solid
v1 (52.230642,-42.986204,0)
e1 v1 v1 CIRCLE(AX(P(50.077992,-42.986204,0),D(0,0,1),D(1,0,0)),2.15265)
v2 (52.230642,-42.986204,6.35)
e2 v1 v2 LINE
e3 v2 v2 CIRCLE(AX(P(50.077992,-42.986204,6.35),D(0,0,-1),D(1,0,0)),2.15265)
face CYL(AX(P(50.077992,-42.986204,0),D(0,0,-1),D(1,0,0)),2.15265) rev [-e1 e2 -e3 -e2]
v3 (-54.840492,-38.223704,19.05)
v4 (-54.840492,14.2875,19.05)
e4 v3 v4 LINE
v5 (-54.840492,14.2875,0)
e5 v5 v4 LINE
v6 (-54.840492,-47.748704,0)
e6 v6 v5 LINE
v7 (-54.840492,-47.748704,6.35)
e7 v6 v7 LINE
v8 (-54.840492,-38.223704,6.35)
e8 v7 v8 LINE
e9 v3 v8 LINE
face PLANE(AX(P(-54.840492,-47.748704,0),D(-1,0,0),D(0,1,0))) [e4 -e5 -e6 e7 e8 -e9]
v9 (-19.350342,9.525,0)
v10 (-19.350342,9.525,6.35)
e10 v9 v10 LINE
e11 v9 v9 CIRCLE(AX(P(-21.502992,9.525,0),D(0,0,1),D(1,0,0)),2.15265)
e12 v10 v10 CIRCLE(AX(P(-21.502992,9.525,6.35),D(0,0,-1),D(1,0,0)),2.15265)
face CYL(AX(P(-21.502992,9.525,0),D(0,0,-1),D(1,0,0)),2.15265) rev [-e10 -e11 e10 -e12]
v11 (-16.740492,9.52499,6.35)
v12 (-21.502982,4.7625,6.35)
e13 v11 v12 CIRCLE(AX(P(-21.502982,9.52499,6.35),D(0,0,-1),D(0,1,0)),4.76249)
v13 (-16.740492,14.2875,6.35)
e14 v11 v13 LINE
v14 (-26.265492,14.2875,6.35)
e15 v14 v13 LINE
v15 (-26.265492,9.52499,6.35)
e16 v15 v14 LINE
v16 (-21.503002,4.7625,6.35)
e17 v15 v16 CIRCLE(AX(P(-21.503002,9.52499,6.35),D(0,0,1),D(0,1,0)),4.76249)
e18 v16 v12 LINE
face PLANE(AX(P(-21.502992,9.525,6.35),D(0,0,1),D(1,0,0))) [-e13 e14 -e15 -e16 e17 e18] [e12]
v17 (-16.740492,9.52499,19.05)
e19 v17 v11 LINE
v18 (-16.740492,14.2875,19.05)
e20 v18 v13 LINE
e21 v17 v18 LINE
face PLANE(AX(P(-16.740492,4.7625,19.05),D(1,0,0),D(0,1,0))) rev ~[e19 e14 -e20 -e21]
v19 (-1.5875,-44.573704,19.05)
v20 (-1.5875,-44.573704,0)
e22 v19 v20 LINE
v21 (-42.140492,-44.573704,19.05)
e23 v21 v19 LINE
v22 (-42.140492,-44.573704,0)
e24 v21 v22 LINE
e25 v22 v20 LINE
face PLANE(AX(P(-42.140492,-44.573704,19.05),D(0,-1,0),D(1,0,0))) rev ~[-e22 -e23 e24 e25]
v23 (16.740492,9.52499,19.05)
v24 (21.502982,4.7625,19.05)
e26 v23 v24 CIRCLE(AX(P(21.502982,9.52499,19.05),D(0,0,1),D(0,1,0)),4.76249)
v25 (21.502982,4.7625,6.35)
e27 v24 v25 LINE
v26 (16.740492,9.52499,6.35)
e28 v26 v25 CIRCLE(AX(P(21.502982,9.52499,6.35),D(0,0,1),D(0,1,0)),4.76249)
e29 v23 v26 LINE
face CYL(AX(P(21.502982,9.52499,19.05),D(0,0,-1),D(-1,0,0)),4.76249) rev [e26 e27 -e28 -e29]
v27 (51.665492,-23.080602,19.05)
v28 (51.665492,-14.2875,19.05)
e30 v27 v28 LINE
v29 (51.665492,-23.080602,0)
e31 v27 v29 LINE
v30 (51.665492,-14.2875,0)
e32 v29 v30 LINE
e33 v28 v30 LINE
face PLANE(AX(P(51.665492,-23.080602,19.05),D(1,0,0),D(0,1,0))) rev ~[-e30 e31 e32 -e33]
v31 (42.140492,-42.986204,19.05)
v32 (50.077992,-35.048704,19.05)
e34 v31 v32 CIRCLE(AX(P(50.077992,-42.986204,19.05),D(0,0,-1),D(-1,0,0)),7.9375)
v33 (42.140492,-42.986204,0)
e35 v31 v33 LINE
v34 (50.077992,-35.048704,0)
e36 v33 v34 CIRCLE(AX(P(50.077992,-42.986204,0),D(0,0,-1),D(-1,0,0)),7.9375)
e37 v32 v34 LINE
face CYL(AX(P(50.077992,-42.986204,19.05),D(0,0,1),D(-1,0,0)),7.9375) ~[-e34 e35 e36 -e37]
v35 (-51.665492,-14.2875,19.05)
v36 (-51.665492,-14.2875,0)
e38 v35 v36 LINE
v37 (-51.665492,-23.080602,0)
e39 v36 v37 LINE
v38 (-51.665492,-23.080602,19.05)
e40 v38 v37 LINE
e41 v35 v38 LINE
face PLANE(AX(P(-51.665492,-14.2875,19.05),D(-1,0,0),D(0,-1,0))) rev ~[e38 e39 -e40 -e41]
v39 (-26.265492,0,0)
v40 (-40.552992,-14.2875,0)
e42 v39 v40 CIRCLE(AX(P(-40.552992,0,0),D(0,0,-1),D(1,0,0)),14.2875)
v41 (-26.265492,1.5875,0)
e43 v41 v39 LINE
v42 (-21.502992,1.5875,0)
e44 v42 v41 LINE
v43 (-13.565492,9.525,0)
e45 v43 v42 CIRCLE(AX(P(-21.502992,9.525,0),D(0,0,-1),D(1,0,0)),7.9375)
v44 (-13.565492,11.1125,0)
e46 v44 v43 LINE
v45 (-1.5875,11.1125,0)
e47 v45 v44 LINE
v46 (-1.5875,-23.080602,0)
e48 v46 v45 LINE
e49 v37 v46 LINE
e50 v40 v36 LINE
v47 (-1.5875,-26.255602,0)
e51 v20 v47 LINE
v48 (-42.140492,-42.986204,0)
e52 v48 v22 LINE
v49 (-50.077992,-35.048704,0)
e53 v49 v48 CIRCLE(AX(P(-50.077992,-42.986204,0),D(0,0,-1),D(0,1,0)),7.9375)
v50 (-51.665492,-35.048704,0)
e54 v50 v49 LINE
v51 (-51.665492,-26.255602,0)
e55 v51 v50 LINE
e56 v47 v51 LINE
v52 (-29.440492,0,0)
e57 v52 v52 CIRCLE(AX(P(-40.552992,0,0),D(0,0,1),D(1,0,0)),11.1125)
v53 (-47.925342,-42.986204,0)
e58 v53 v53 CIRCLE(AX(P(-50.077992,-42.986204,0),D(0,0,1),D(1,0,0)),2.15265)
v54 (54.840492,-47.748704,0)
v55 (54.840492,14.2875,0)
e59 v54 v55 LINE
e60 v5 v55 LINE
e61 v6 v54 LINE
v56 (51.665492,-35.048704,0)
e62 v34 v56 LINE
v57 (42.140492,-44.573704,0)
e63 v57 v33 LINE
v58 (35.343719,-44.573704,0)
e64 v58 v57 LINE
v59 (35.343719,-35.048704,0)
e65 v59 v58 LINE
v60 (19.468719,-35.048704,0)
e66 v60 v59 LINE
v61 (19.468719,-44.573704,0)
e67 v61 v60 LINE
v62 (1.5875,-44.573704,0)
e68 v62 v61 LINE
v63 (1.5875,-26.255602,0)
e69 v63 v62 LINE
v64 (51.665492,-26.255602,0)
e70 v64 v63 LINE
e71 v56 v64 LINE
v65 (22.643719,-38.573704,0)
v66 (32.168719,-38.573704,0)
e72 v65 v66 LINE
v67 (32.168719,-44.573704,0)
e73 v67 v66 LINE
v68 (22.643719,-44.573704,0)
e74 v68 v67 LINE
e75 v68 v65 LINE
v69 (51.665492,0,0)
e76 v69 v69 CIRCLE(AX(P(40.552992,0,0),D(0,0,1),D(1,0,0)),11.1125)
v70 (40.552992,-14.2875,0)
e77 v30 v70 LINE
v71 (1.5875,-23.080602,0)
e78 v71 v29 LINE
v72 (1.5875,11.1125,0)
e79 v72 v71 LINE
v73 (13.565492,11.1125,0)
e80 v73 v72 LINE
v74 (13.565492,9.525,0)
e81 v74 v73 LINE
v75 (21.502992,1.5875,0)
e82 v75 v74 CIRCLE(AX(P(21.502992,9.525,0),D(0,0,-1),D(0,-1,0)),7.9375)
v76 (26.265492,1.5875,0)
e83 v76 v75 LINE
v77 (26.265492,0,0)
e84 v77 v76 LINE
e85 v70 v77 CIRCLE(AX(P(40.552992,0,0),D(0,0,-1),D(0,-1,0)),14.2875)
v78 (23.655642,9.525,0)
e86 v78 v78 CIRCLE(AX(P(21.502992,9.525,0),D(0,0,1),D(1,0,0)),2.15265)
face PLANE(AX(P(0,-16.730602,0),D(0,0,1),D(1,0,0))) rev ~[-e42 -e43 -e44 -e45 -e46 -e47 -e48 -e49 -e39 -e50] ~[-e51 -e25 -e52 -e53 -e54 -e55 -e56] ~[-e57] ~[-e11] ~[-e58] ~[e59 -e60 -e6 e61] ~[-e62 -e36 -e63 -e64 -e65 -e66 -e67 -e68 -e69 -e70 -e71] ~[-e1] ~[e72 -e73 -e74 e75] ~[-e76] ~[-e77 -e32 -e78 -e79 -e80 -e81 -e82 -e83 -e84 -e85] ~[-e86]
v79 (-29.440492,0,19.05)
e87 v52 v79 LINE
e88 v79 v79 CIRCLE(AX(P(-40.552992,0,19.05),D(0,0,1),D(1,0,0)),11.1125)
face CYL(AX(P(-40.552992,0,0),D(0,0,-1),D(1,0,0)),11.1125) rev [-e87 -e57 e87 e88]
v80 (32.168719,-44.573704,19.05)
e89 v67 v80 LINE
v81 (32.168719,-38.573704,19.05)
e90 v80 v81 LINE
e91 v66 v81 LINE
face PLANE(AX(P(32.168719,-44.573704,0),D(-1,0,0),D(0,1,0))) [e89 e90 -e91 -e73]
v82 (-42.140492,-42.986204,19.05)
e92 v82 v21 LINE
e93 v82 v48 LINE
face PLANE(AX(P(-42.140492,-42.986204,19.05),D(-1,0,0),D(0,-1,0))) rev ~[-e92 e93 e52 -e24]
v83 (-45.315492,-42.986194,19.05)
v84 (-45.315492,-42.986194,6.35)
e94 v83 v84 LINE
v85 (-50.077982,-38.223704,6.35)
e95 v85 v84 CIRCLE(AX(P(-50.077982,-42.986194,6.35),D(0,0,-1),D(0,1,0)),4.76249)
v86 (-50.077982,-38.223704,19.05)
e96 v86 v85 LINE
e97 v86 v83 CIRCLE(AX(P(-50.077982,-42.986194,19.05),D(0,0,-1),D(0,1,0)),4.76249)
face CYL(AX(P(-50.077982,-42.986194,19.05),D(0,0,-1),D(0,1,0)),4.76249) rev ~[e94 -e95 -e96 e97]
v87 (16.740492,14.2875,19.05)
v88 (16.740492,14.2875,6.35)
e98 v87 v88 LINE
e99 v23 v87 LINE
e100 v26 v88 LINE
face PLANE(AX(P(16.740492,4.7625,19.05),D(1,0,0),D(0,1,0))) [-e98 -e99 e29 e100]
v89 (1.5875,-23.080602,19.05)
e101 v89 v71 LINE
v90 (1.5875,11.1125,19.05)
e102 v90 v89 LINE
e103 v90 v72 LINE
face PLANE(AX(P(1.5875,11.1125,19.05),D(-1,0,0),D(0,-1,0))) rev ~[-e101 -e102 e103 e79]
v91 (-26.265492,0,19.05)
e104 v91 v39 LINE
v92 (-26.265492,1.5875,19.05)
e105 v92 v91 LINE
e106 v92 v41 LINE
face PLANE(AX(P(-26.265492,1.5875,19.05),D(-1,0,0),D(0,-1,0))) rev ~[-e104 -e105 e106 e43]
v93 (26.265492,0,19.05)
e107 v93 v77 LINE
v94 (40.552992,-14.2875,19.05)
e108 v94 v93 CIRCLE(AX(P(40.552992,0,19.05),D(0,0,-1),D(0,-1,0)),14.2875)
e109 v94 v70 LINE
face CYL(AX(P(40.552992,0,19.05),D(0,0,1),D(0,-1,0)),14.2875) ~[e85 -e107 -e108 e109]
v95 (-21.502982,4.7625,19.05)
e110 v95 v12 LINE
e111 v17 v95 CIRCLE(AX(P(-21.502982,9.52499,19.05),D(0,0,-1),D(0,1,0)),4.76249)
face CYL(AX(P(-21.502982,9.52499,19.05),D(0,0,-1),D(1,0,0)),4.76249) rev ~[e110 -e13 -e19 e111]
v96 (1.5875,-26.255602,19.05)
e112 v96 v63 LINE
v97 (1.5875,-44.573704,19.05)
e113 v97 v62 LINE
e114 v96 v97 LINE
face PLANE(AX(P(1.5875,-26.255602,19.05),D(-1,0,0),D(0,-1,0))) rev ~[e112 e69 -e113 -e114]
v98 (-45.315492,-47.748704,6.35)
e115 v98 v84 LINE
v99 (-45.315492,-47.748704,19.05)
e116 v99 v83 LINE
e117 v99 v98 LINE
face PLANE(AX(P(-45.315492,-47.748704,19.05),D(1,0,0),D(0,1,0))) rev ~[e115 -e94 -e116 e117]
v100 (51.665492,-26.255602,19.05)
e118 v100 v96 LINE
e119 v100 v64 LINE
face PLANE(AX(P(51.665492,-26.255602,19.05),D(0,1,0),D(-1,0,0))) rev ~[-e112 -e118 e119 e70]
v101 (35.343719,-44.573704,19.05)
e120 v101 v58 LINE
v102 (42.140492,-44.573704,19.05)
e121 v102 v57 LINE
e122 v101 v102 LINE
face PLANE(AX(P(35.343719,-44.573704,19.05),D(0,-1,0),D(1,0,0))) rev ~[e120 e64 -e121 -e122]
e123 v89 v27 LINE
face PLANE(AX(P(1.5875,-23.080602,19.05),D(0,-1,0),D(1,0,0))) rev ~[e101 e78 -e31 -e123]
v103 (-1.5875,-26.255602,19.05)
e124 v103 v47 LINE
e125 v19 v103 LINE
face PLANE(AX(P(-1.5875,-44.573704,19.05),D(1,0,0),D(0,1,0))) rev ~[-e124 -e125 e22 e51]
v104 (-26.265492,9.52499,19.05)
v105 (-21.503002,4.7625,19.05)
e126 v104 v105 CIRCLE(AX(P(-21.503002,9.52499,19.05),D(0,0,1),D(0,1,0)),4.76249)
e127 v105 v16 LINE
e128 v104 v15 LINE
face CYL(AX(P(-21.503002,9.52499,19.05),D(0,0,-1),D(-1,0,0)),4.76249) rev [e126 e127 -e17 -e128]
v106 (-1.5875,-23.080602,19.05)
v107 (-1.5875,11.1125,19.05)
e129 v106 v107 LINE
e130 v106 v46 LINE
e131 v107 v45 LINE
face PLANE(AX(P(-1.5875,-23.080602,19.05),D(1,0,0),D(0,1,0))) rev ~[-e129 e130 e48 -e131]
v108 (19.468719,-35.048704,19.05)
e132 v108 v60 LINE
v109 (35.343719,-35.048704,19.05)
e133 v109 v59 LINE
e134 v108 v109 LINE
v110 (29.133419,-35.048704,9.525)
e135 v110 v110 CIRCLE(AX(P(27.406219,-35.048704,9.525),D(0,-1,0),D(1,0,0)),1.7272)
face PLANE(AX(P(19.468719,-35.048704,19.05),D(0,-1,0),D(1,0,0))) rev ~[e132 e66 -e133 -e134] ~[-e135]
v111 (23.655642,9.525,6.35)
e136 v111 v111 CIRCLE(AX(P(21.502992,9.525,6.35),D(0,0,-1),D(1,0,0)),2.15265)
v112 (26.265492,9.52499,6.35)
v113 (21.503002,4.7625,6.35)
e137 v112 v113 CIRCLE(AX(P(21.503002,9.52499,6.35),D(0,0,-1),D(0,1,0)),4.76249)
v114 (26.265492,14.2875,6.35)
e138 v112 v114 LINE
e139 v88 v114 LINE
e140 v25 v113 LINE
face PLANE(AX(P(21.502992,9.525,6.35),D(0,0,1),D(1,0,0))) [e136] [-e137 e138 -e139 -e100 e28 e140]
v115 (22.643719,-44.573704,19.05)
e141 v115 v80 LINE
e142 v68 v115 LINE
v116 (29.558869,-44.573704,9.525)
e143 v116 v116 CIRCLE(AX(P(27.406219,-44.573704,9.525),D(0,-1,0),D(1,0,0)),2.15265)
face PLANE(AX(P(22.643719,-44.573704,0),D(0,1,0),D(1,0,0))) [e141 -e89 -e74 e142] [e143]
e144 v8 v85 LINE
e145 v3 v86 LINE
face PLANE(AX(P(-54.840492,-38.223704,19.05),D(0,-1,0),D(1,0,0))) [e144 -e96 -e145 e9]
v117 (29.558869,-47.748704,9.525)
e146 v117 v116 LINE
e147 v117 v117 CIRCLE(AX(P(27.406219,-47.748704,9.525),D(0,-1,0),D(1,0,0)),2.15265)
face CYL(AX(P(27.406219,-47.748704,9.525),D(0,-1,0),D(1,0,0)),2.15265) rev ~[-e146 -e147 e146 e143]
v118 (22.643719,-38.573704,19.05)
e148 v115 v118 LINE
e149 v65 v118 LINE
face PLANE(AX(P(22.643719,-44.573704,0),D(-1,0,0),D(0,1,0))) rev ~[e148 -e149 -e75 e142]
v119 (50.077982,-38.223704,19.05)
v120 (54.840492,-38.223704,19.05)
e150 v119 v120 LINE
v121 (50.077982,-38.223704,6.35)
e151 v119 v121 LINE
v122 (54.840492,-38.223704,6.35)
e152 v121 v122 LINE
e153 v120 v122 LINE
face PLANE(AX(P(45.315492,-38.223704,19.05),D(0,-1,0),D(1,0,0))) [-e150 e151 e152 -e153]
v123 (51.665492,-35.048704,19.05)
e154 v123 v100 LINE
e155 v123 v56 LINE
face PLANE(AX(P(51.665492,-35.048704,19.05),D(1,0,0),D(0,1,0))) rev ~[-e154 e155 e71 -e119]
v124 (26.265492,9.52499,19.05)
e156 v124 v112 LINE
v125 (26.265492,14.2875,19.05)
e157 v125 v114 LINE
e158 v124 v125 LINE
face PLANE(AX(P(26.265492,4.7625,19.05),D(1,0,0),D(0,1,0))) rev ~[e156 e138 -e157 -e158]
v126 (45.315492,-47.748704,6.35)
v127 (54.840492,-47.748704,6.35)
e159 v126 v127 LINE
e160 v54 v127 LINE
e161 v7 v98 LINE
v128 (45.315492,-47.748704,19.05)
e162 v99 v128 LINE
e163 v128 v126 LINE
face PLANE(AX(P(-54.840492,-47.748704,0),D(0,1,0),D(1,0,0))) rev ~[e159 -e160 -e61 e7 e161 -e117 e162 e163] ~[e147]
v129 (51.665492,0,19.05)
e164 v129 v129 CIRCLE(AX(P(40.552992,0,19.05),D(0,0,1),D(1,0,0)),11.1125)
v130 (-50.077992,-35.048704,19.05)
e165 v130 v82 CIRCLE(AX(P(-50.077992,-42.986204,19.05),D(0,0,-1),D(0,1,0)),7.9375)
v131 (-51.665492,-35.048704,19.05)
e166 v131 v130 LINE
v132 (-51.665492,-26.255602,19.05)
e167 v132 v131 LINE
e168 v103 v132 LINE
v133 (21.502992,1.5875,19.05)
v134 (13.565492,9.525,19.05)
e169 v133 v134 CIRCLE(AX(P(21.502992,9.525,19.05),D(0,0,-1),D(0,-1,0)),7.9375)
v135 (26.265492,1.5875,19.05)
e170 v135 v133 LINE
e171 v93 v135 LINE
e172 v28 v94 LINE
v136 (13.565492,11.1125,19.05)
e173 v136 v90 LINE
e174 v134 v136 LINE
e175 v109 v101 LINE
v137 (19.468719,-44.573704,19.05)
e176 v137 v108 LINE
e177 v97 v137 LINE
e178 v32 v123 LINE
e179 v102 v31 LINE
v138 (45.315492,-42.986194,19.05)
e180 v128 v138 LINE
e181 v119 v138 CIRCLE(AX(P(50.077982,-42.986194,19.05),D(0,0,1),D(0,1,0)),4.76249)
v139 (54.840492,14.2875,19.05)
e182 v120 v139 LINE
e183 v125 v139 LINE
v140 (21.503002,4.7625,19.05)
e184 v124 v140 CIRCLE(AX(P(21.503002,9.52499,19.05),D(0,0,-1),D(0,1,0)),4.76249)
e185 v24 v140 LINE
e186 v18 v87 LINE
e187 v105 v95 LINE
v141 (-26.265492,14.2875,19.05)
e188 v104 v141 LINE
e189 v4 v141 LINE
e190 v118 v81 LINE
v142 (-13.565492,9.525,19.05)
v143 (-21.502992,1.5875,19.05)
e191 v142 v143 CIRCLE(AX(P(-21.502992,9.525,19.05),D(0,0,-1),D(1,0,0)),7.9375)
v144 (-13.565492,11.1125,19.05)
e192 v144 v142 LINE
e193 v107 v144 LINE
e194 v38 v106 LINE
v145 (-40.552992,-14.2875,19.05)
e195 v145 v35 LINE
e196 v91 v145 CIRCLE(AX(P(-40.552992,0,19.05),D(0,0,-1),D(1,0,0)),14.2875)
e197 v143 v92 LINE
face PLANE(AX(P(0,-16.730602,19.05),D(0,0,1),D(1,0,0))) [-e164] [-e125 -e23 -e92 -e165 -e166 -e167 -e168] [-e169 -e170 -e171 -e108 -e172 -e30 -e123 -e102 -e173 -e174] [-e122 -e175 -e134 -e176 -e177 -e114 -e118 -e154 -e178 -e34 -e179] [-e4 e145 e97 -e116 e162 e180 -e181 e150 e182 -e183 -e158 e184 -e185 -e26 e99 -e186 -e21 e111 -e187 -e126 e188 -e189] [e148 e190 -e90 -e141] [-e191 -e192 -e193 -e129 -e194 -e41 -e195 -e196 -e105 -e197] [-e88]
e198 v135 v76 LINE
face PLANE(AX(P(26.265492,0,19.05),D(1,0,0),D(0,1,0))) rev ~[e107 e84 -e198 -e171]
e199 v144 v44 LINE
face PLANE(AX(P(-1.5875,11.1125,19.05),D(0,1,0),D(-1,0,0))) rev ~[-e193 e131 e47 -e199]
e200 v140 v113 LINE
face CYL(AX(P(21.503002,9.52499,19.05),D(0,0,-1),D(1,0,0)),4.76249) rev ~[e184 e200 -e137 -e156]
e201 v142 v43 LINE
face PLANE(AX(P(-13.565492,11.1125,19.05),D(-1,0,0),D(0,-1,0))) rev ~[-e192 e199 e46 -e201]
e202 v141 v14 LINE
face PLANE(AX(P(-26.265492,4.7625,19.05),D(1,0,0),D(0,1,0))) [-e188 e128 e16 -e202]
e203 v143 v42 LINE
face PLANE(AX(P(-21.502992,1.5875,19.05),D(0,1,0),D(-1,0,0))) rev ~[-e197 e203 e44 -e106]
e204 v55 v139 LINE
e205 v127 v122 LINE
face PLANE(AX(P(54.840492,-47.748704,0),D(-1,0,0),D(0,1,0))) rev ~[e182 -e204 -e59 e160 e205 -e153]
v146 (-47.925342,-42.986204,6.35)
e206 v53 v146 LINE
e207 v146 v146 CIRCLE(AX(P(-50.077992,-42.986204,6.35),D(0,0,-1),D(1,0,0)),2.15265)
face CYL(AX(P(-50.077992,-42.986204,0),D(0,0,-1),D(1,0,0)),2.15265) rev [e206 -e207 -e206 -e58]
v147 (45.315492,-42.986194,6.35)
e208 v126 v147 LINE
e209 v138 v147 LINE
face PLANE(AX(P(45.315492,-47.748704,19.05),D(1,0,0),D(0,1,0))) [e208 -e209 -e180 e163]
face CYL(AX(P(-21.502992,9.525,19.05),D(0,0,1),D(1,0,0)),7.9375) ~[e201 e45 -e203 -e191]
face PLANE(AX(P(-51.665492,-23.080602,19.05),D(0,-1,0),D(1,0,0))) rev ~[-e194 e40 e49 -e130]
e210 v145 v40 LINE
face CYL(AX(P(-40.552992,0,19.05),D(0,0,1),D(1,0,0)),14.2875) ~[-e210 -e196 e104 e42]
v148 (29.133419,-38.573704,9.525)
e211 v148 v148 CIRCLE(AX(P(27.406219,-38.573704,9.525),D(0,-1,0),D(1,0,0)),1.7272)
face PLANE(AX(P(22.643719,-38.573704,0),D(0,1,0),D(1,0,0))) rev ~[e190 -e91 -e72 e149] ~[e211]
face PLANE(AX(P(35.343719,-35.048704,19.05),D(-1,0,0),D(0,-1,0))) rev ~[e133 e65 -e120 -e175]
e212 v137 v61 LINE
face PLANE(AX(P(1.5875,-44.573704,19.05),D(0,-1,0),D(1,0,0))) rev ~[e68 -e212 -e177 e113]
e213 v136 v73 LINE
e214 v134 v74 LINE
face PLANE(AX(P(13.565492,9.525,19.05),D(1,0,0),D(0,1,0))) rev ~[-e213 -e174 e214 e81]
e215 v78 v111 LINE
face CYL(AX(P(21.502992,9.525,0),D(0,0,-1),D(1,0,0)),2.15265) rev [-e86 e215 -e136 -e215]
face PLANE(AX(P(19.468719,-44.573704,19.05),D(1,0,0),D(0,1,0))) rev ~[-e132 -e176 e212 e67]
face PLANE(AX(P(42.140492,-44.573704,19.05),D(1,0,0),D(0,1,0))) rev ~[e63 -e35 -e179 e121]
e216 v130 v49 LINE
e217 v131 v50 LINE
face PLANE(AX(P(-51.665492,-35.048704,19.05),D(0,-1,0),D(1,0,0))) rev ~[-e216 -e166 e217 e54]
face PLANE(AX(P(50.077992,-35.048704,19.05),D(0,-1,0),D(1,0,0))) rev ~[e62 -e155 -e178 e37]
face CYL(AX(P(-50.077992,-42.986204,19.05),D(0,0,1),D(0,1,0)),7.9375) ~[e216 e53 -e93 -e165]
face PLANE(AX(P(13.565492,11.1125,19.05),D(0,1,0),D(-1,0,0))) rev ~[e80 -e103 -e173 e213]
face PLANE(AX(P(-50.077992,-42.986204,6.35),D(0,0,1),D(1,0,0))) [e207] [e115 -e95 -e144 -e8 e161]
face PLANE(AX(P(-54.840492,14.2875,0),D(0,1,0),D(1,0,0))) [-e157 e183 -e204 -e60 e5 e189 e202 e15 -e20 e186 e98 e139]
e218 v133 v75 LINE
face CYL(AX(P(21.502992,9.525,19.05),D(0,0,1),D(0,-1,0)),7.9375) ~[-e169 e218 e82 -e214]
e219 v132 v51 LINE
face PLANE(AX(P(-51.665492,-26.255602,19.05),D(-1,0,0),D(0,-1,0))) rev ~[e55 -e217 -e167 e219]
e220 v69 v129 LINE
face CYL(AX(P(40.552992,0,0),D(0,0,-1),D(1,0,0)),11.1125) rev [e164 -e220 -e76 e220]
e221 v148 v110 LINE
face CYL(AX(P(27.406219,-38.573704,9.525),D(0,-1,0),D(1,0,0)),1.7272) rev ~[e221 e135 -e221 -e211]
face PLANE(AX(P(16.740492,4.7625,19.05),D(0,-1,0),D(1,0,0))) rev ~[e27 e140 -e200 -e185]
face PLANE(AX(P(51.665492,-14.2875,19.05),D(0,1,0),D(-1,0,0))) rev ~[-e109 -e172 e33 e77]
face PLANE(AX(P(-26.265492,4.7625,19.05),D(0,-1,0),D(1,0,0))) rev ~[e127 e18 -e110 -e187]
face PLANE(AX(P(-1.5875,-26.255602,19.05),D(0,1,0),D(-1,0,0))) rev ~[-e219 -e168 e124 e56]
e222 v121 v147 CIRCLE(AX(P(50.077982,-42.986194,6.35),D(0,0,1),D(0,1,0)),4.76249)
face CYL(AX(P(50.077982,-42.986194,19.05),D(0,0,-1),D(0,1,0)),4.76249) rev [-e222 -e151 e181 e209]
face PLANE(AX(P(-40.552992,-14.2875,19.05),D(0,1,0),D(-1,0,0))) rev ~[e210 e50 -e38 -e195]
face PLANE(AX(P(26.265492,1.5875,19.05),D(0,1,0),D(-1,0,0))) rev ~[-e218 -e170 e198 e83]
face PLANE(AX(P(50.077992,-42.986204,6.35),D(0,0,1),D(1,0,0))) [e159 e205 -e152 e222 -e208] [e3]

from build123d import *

# Parameters (mm, degrees)
F0_W      = 109.6809846
F0_H      = 62.036204
F0_R      = 2.15265
F0_W_2    = 9.525
F0_H_2    = 6
F0_R_2    = 11.1125
F1_DEPTH  = 19.05
F2_W      = 9.525
F2_H      = 9.525
F3_DEPTH  = 12.7
F4_R      = 4.76249
F6_DEPTH  = 19.05
F7_R      = 2.15265
F8_DEPTH  = 3.175
F9_R      = 1.7272
F10_DEPTH = 3.525


# Not quite as in the source:
# - a fillet or chamfer is up to 0.001 mm smaller than in the source, because OpenCascade refuses the exact size


with BuildPart() as f1:
    # F0 (on Top) → F1 (new body)
    with BuildSketch(Plane.XY):
        with Locations((0, -16.730602)):
            Rectangle(F0_W, F0_H)
        with Locations((-50.0779923, -42.986204)):
            Circle(F0_R, mode=Mode.SUBTRACT)
        with Locations((27.406219, -41.573704)):
            Rectangle(F0_W_2, F0_H_2, mode=Mode.SUBTRACT)
        with Locations((50.0779923, -42.986204)):
            Circle(F0_R, mode=Mode.SUBTRACT)
        with Locations((-40.5529923, 0)):
            Circle(F0_R_2, mode=Mode.SUBTRACT)
        with Locations((-21.5029923, 9.525)):
            Circle(F0_R, mode=Mode.SUBTRACT)
        with Locations((21.5029923, 9.525)):
            Circle(F0_R, mode=Mode.SUBTRACT)
        with Locations((40.5529923, 0)):
            Circle(F0_R_2, mode=Mode.SUBTRACT)
    extrude(amount=F1_DEPTH)

    # F2 (on face) → F3 (cut)
    with BuildSketch(Plane.XY.offset(19.05)):
        with Locations((-21.5029923, 9.525)):
            Rectangle(F2_W, F2_H)
        with Locations((21.5029923, 9.525)):
            Rectangle(F2_W, F2_H)
        with Locations((50.0779923, -42.986204)):
            Rectangle(F2_W, F2_H)
        with Locations((-50.0779923, -42.986204)):
            Rectangle(F2_W, F2_H)
    extrude(amount=-F3_DEPTH, mode=Mode.SUBTRACT)

    # F4 (radius 4.7625 in the source; OpenCascade refuses exactly that, so slightly less here)
    f4_edges = [f1.edges().sort_by_distance(p)[0] for p in [
        (-45.315492, -38.223704, 12.7),
        (45.315492, -38.223704, 12.7),
        (16.740492, 4.7625, 12.7),
        (26.265492, 4.7625, 12.7),
        (-16.740492, 4.7625, 12.7),
        (-26.265492, 4.7625, 12.7),
    ]]
    fillet(f4_edges, radius=F4_R)

    # F5 (on face) → F6 (cut, through all)
    with BuildSketch(Plane.XY.offset(19.05)):
        with BuildLine():
            Line((-51.6654923, -23.080602), (-1.5875, -23.080602))
            Line((-1.5875, -23.080602), (-1.5875, 11.1125))
            Line((-1.5875, 11.1125), (-13.5654923, 11.1125))
            Line((-13.5654923, 11.1125), (-13.5654923, 9.525))
            ThreePointArc((-13.5654923, 9.525), (-15.8903322243, 3.9123399243), (-21.5029923, 1.5875))
            Line((-21.5029923, 1.5875), (-26.2654923, 1.5875))
            Line((-26.2654923, 1.5875), (-26.2654923, 0))
            ThreePointArc((-26.2654923, 0), (-30.4502041638, -10.1027881362), (-40.5529923, -14.2875))
            Line((-40.5529923, -14.2875), (-51.6654923, -14.2875))
            Line((-51.6654923, -14.2875), (-51.6654923, -23.080602))
        make_face()
        with BuildLine():
            Line((-1.5875, -44.573704), (-1.5875, -26.255602))
            Line((-1.5875, -26.255602), (-51.6654923, -26.255602))
            Line((-51.6654923, -26.255602), (-51.6654923, -35.048704))
            Line((-51.6654923, -35.048704), (-50.0779923, -35.048704))
            ThreePointArc((-50.0779923, -35.048704), (-44.4653322243, -37.3735439243), (-42.1404923, -42.986204))
            Line((-42.1404923, -42.986204), (-42.1404923, -44.573704))
            Line((-42.1404923, -44.573704), (-1.5875, -44.573704))
        make_face()
        with BuildLine():
            Line((1.5875, -23.080602), (51.6654923, -23.080602))
            Line((51.6654923, -23.080602), (51.6654923, -14.2875))
            Line((51.6654923, -14.2875), (40.5529923, -14.2875))
            ThreePointArc((40.5529923, -14.2875), (30.4502041638, -10.1027881362), (26.2654923, 0))
            Line((26.2654923, 0), (26.2654923, 1.5875))
            Line((26.2654923, 1.5875), (21.5029923, 1.5875))
            ThreePointArc((21.5029923, 1.5875), (15.8903322243, 3.9123399243), (13.5654923, 9.525))
            Line((13.5654923, 9.525), (13.5654923, 11.1125))
            Line((13.5654923, 11.1125), (1.5875, 11.1125))
            Line((1.5875, 11.1125), (1.5875, -23.080602))
        make_face()
        with BuildLine():
            Line((51.6654923, -26.255602), (1.5875, -26.255602))
            Line((1.5875, -26.255602), (1.5875, -44.573704))
            Line((1.5875, -44.573704), (19.468719, -44.573704))
            Line((19.468719, -44.573704), (19.468719, -35.048704))
            Line((19.468719, -35.048704), (35.343719, -35.048704))
            Line((35.343719, -35.048704), (35.343719, -44.573704))
            Line((35.343719, -44.573704), (42.1404923, -44.573704))
            Line((42.1404923, -44.573704), (42.1404923, -42.986204))
            ThreePointArc((42.1404923, -42.986204), (44.4653322243, -37.3735439243), (50.0779923, -35.048704))
            Line((50.0779923, -35.048704), (51.6654923, -35.048704))
            Line((51.6654923, -35.048704), (51.6654923, -26.255602))
        make_face()
    extrude(amount=-F6_DEPTH, mode=Mode.SUBTRACT)

    # F7 (on face) → F8 (cut, through all)
    with BuildSketch(Plane.XZ.offset(47.748704)):
        with Locations((27.406219, 9.525)):
            Circle(F7_R)
    extrude(amount=-F8_DEPTH, mode=Mode.SUBTRACT)

    # F9 (on face) → F10 (cut, through all)
    with BuildSketch(Plane.XZ.offset(38.573704)):
        with Locations((27.406219, 9.525)):
            Circle(F9_R)
    extrude(amount=-F10_DEPTH, mode=Mode.SUBTRACT)


solid = f1.part
